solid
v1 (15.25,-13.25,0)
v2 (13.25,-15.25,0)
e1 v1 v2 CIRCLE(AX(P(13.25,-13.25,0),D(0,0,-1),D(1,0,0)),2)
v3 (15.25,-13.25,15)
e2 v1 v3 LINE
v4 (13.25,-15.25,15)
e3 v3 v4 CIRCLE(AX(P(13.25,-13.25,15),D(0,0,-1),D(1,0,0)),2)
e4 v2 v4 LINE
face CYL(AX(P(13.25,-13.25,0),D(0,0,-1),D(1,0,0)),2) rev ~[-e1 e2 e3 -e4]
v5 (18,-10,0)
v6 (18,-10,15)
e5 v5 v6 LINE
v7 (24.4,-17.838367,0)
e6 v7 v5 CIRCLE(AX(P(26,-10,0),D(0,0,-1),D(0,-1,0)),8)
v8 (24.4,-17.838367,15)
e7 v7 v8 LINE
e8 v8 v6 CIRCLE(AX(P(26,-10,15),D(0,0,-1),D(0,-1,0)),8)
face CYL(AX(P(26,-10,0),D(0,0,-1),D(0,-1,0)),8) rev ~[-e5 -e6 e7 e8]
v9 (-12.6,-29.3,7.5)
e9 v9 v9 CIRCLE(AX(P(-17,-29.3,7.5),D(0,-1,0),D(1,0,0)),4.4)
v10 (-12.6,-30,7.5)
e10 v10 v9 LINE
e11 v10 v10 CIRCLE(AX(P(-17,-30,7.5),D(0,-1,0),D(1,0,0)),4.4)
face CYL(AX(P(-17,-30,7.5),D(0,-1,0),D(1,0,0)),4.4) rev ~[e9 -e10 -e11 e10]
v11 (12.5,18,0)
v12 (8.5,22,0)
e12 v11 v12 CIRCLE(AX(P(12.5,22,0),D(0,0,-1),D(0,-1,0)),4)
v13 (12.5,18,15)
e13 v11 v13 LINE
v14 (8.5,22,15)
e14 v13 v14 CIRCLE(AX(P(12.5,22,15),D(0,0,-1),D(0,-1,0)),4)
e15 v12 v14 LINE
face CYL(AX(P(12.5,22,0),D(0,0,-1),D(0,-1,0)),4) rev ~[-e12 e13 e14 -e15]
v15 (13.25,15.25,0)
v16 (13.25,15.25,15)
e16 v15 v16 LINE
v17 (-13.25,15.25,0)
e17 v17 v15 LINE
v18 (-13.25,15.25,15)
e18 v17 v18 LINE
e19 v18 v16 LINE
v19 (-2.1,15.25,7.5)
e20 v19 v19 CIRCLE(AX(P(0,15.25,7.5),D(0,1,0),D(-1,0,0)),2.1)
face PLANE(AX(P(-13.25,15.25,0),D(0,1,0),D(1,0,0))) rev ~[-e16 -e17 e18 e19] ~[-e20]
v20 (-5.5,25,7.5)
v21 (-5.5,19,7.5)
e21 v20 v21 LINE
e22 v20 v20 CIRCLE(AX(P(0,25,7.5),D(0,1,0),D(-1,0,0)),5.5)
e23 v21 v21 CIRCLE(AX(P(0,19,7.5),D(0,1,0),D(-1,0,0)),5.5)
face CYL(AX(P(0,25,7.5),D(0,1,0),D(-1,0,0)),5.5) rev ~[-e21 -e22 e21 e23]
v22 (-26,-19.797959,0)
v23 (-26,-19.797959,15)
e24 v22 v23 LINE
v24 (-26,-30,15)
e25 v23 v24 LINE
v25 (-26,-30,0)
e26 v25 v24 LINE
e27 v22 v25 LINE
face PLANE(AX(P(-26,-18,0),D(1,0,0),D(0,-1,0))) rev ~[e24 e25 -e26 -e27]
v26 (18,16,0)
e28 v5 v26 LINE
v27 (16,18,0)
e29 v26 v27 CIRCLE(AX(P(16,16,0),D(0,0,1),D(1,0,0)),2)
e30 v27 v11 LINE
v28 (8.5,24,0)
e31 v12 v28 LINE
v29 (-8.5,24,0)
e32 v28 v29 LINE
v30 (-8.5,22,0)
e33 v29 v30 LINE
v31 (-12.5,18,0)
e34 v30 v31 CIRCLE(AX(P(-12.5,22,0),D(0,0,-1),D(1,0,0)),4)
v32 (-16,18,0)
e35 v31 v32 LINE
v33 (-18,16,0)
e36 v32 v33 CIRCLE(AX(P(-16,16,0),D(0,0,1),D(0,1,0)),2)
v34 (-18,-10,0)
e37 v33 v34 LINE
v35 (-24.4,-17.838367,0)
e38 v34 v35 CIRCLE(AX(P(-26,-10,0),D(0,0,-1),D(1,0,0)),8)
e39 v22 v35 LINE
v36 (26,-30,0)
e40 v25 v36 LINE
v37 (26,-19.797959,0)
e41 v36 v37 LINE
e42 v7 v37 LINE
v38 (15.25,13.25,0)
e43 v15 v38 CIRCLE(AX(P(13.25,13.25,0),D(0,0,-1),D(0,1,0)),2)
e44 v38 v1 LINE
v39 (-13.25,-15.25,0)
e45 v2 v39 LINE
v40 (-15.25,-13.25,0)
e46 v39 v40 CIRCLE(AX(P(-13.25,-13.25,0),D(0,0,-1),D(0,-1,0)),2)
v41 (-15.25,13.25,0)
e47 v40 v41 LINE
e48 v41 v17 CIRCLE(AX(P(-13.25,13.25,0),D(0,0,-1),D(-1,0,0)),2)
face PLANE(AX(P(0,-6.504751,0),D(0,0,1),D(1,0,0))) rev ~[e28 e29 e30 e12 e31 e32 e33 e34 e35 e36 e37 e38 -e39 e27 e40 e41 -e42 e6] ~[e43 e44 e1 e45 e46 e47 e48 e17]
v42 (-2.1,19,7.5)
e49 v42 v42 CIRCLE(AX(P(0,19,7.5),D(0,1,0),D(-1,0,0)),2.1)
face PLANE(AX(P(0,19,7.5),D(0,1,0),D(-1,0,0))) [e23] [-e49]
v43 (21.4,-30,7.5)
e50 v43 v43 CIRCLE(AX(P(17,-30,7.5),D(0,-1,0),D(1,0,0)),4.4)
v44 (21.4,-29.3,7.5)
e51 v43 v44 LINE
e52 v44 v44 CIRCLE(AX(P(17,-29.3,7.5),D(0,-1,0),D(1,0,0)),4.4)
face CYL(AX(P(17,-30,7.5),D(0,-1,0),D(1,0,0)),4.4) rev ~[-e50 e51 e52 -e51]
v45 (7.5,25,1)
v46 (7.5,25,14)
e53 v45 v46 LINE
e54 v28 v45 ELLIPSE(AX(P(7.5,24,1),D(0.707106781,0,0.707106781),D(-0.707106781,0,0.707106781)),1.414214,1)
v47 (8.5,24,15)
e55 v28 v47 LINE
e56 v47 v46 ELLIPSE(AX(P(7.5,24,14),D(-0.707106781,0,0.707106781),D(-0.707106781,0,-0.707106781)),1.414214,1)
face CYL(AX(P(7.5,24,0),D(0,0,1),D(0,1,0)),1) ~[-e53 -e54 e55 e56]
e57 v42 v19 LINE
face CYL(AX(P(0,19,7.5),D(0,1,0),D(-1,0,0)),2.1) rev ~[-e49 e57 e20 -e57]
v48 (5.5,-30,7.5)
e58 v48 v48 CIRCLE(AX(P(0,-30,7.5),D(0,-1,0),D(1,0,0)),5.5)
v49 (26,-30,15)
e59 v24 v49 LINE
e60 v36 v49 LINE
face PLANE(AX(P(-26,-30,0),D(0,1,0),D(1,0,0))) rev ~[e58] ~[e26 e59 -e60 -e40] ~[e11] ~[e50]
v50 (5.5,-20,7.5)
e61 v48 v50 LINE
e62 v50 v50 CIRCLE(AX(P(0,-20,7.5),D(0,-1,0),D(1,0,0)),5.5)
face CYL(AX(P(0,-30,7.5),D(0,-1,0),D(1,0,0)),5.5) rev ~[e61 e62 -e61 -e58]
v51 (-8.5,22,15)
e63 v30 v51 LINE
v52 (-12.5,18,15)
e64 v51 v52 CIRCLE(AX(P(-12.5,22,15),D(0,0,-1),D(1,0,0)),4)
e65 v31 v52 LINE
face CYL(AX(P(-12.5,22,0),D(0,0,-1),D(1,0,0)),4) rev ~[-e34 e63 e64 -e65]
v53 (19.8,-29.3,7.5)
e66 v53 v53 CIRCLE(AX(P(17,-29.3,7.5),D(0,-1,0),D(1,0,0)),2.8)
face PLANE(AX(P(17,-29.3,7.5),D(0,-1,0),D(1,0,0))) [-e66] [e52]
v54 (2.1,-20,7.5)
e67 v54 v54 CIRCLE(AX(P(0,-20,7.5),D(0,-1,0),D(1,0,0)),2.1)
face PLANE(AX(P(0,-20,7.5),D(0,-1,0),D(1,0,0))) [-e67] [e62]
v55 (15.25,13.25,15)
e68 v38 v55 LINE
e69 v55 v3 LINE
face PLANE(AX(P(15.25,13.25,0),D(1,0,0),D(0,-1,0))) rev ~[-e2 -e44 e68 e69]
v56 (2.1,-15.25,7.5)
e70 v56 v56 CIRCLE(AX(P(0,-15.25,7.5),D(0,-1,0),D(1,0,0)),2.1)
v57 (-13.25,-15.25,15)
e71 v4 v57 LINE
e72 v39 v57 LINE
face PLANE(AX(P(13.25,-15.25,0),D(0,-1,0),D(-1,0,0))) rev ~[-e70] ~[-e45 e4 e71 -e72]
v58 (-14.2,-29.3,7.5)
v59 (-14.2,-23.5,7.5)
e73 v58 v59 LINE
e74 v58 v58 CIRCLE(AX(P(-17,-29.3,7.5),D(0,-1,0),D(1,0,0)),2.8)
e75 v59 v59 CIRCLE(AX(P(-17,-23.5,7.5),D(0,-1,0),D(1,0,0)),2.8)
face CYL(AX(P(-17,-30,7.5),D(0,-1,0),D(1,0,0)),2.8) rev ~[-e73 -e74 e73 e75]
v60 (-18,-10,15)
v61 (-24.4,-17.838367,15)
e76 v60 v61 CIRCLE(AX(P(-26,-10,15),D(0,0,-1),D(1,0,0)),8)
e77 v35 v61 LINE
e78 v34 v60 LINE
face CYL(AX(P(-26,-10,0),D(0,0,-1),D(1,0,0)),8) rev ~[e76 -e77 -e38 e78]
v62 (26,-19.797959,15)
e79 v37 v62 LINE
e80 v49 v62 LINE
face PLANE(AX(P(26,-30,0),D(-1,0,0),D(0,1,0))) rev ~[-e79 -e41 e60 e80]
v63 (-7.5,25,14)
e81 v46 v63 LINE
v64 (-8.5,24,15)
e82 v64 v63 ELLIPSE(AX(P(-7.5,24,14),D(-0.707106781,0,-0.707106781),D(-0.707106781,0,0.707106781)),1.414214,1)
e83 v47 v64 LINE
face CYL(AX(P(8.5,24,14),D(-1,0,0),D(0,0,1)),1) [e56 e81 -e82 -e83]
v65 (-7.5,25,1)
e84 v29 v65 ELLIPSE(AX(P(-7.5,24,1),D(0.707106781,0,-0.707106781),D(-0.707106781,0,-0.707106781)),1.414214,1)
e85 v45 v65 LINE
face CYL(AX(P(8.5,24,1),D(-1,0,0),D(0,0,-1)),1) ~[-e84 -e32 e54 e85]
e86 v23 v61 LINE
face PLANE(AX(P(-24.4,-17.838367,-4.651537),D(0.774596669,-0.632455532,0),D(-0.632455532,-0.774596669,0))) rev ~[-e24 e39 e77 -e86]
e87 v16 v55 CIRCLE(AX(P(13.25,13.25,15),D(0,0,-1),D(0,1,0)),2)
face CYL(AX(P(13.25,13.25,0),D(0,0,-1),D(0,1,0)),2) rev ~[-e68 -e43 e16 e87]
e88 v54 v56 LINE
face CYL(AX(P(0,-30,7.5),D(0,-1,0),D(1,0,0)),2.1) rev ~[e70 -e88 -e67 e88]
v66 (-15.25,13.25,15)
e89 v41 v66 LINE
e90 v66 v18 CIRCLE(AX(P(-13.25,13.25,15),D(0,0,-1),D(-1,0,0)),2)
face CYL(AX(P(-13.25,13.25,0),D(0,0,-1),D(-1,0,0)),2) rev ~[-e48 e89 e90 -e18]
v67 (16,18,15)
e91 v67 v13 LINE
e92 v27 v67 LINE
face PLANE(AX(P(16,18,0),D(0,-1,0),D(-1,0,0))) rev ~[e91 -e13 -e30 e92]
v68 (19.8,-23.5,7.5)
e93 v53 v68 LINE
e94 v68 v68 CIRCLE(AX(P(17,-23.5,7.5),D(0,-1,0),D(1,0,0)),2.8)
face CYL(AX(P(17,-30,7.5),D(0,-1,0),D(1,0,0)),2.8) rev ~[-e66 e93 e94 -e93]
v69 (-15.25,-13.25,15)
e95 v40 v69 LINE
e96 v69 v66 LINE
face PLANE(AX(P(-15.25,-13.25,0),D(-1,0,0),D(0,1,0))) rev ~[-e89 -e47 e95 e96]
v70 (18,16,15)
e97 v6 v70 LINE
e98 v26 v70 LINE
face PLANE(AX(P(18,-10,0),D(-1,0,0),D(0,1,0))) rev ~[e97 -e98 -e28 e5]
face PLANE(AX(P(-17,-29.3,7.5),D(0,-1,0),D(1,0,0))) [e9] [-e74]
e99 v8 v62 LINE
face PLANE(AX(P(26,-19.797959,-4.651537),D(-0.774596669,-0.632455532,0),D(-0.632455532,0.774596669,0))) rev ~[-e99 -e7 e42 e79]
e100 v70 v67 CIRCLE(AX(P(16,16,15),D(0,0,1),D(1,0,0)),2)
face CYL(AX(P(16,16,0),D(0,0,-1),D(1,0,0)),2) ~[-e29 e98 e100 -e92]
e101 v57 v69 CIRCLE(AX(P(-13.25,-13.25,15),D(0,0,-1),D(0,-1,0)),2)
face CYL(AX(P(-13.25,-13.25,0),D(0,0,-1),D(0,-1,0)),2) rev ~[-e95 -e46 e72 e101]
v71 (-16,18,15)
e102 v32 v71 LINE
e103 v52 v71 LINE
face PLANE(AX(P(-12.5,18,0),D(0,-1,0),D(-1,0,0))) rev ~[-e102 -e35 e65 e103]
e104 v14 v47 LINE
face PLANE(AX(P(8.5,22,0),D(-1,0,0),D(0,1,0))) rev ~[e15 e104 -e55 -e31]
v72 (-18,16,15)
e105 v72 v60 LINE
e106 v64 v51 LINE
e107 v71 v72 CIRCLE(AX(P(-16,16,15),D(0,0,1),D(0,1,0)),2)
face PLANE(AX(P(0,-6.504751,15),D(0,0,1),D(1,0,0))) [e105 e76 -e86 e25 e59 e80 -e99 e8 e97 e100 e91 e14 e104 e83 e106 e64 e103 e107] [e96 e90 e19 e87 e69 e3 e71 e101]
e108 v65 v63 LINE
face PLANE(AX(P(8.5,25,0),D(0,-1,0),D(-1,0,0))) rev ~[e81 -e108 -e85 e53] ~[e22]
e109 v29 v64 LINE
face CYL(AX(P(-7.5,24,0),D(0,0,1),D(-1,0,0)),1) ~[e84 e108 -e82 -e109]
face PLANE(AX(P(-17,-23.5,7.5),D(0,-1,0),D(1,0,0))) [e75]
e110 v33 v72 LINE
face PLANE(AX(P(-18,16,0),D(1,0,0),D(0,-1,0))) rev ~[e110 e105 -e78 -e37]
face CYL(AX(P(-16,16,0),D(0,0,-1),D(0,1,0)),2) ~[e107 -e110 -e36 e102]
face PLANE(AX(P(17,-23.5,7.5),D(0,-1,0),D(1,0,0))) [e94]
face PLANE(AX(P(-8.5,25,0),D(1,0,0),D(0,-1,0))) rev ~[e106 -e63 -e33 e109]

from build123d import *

# Parameters (mm, degrees)
F1_DEPTH       = 15
F2_T1_DEPTH    = 24.3030738828
F4_R           = 5.5
F5_DEPTH       = 6
F6_R           = 1
F7_R           = 2.1
F8_DEPTH       = 3.75
F9_R           = 5.5
F10_DEPTH      = 10
F10_DEPTH_BACK = 25
F11_R          = 2.1
F12_DEPTH      = 14.75
F3_R           = 2.8
F13_DEPTH      = 6.5
F14_R          = 4.4
F15_DEPTH      = 0.7


# Not quite as in the source:
# - a fillet or chamfer that OpenCascade refuses, or shapes differently, is made with other operations: its cross-section is extruded or revolved along the edge and cut away or added


with BuildPart() as f1:
    # F0 (on Top) → F1 (new body)
    with BuildSketch(Plane.XY):
        with BuildLine():
            ThreePointArc((18, 16), (17.4142135624, 17.4142135624), (16, 18))
            Line((16, 18), (12.5, 18))
            ThreePointArc((12.5, 18), (9.6715728753, 19.1715728753), (8.5, 22))
            Line((8.5, 22), (8.5, 25))
            Line((8.5, 25), (-8.5, 25))
            Line((-8.5, 25), (-8.5, 22))
            ThreePointArc((-8.5, 22), (-9.6715728753, 19.1715728753), (-12.5, 18))
            Line((-12.5, 18), (-16, 18))
            ThreePointArc((-16, 18), (-17.4142135624, 17.4142135624), (-18, 16))
            Line((-18, 16), (-18, -10))
            ThreePointArc((-18, -10), (-20.3431457505, -15.6568542495), (-26, -18))
            Line((-26, -18), (-26, -30))
            Line((-26, -30), (26, -30))
            Line((26, -30), (26, -18))
            ThreePointArc((26, -18), (20.3431457505, -15.6568542495), (18, -10))
            Line((18, -10), (18, 16))
        make_face()
        with BuildLine():
            Line((-13.25, 15.25), (13.25, 15.25))
            ThreePointArc((13.25, 15.25), (14.6642135624, 14.6642135624), (15.25, 13.25))
            Line((15.25, 13.25), (15.25, -13.25))
            ThreePointArc((15.25, -13.25), (14.6642135624, -14.6642135624), (13.25, -15.25))
            Line((13.25, -15.25), (-13.25, -15.25))
            ThreePointArc((-13.25, -15.25), (-14.6642135624, -14.6642135624), (-15.25, -13.25))
            Line((-15.25, -13.25), (-15.25, 13.25))
            ThreePointArc((-15.25, 13.25), (-14.6642135624, 14.6642135624), (-13.25, 15.25))
        make_face(mode=Mode.SUBTRACT)
    extrude(amount=F1_DEPTH)

    # F2: chamfer of 2 on 2 edges, made by hand

    # F2_s2 → F2_t1 (cut)
    with BuildSketch(Plane.XY.offset(-4.6515369414)):
        with BuildLine():
            Line((-24.4, -17.8383671769), (-26, -19.7979589711))
            Line((-26, -19.7979589711), (-26, -18))
            ThreePointArc((-26, -18), (-25.1675484588, -17.9565711479), (-24.4, -17.8383671769))
        make_face()
        with BuildLine():
            Line((26, -19.7979589711), (24.4, -17.8383671769))
            ThreePointArc((24.4, -17.8383671769), (25.1675484588, -17.9565711479), (26, -18))
            Line((26, -18), (26, -19.7979589711))
        make_face()
    extrude(amount=F2_T1_DEPTH, mode=Mode.SUBTRACT)

    # F4 (on face) → F5 (cut)
    with BuildSketch(Plane(origin=(0, 25, 0), x_dir=(-1, 0, 0), z_dir=(0, 1, 0))):
        with Locations((0, 7.5)):
            Circle(F4_R)
    extrude(amount=-F5_DEPTH, mode=Mode.SUBTRACT)

    # F6
    f6_edges = [f1.edges().sort_by_distance(p)[0] for p in [
        (0, 25, 0),
        (-8.5, 25, 7.5),
        (0, 25, 15),
        (8.5, 25, 7.5),
    ]]
    fillet(f6_edges, radius=F6_R)

    # F7 (on face) → F8 (cut, through all)
    with BuildSketch(Plane(origin=(0, 19, 0), x_dir=(-1, 0, 0), z_dir=(0, 1, 0))):
        with Locations((0, 7.5)):
            Circle(F7_R)
    extrude(amount=-F8_DEPTH, mode=Mode.SUBTRACT)

    # F9 (on face) → F10 (cut, two sides)
    with BuildSketch(Plane.XZ.offset(30)) as f10_sk:
        with Locations((0, 7.5)):
            Circle(F9_R)
    extrude(amount=-F10_DEPTH, mode=Mode.SUBTRACT)
    extrude(f10_sk.sketch, amount=F10_DEPTH_BACK, mode=Mode.SUBTRACT)

    # F11 (on face) → F12 (cut, through all)
    with BuildSketch(Plane.XZ.offset(30)):
        with Locations((0, 7.5)):
            Circle(F11_R)
    extrude(amount=-F12_DEPTH, mode=Mode.SUBTRACT)

    # F3 (on face) → F13 (cut)
    with BuildSketch(Plane.XZ.offset(30)):
        with Locations((-17, 7.5)):
            Circle(F3_R)
        with Locations((17, 7.5)):
            Circle(F3_R)
    extrude(amount=-F13_DEPTH, mode=Mode.SUBTRACT)

    # F14 (on face) → F15 (cut)
    with BuildSketch(Plane.XZ.offset(30)):
        with Locations((17, 7.5)):
            Circle(F14_R)
        with Locations((-17, 7.5)):
            Circle(F14_R)
    extrude(amount=-F15_DEPTH, mode=Mode.SUBTRACT)


solid = f1.part
